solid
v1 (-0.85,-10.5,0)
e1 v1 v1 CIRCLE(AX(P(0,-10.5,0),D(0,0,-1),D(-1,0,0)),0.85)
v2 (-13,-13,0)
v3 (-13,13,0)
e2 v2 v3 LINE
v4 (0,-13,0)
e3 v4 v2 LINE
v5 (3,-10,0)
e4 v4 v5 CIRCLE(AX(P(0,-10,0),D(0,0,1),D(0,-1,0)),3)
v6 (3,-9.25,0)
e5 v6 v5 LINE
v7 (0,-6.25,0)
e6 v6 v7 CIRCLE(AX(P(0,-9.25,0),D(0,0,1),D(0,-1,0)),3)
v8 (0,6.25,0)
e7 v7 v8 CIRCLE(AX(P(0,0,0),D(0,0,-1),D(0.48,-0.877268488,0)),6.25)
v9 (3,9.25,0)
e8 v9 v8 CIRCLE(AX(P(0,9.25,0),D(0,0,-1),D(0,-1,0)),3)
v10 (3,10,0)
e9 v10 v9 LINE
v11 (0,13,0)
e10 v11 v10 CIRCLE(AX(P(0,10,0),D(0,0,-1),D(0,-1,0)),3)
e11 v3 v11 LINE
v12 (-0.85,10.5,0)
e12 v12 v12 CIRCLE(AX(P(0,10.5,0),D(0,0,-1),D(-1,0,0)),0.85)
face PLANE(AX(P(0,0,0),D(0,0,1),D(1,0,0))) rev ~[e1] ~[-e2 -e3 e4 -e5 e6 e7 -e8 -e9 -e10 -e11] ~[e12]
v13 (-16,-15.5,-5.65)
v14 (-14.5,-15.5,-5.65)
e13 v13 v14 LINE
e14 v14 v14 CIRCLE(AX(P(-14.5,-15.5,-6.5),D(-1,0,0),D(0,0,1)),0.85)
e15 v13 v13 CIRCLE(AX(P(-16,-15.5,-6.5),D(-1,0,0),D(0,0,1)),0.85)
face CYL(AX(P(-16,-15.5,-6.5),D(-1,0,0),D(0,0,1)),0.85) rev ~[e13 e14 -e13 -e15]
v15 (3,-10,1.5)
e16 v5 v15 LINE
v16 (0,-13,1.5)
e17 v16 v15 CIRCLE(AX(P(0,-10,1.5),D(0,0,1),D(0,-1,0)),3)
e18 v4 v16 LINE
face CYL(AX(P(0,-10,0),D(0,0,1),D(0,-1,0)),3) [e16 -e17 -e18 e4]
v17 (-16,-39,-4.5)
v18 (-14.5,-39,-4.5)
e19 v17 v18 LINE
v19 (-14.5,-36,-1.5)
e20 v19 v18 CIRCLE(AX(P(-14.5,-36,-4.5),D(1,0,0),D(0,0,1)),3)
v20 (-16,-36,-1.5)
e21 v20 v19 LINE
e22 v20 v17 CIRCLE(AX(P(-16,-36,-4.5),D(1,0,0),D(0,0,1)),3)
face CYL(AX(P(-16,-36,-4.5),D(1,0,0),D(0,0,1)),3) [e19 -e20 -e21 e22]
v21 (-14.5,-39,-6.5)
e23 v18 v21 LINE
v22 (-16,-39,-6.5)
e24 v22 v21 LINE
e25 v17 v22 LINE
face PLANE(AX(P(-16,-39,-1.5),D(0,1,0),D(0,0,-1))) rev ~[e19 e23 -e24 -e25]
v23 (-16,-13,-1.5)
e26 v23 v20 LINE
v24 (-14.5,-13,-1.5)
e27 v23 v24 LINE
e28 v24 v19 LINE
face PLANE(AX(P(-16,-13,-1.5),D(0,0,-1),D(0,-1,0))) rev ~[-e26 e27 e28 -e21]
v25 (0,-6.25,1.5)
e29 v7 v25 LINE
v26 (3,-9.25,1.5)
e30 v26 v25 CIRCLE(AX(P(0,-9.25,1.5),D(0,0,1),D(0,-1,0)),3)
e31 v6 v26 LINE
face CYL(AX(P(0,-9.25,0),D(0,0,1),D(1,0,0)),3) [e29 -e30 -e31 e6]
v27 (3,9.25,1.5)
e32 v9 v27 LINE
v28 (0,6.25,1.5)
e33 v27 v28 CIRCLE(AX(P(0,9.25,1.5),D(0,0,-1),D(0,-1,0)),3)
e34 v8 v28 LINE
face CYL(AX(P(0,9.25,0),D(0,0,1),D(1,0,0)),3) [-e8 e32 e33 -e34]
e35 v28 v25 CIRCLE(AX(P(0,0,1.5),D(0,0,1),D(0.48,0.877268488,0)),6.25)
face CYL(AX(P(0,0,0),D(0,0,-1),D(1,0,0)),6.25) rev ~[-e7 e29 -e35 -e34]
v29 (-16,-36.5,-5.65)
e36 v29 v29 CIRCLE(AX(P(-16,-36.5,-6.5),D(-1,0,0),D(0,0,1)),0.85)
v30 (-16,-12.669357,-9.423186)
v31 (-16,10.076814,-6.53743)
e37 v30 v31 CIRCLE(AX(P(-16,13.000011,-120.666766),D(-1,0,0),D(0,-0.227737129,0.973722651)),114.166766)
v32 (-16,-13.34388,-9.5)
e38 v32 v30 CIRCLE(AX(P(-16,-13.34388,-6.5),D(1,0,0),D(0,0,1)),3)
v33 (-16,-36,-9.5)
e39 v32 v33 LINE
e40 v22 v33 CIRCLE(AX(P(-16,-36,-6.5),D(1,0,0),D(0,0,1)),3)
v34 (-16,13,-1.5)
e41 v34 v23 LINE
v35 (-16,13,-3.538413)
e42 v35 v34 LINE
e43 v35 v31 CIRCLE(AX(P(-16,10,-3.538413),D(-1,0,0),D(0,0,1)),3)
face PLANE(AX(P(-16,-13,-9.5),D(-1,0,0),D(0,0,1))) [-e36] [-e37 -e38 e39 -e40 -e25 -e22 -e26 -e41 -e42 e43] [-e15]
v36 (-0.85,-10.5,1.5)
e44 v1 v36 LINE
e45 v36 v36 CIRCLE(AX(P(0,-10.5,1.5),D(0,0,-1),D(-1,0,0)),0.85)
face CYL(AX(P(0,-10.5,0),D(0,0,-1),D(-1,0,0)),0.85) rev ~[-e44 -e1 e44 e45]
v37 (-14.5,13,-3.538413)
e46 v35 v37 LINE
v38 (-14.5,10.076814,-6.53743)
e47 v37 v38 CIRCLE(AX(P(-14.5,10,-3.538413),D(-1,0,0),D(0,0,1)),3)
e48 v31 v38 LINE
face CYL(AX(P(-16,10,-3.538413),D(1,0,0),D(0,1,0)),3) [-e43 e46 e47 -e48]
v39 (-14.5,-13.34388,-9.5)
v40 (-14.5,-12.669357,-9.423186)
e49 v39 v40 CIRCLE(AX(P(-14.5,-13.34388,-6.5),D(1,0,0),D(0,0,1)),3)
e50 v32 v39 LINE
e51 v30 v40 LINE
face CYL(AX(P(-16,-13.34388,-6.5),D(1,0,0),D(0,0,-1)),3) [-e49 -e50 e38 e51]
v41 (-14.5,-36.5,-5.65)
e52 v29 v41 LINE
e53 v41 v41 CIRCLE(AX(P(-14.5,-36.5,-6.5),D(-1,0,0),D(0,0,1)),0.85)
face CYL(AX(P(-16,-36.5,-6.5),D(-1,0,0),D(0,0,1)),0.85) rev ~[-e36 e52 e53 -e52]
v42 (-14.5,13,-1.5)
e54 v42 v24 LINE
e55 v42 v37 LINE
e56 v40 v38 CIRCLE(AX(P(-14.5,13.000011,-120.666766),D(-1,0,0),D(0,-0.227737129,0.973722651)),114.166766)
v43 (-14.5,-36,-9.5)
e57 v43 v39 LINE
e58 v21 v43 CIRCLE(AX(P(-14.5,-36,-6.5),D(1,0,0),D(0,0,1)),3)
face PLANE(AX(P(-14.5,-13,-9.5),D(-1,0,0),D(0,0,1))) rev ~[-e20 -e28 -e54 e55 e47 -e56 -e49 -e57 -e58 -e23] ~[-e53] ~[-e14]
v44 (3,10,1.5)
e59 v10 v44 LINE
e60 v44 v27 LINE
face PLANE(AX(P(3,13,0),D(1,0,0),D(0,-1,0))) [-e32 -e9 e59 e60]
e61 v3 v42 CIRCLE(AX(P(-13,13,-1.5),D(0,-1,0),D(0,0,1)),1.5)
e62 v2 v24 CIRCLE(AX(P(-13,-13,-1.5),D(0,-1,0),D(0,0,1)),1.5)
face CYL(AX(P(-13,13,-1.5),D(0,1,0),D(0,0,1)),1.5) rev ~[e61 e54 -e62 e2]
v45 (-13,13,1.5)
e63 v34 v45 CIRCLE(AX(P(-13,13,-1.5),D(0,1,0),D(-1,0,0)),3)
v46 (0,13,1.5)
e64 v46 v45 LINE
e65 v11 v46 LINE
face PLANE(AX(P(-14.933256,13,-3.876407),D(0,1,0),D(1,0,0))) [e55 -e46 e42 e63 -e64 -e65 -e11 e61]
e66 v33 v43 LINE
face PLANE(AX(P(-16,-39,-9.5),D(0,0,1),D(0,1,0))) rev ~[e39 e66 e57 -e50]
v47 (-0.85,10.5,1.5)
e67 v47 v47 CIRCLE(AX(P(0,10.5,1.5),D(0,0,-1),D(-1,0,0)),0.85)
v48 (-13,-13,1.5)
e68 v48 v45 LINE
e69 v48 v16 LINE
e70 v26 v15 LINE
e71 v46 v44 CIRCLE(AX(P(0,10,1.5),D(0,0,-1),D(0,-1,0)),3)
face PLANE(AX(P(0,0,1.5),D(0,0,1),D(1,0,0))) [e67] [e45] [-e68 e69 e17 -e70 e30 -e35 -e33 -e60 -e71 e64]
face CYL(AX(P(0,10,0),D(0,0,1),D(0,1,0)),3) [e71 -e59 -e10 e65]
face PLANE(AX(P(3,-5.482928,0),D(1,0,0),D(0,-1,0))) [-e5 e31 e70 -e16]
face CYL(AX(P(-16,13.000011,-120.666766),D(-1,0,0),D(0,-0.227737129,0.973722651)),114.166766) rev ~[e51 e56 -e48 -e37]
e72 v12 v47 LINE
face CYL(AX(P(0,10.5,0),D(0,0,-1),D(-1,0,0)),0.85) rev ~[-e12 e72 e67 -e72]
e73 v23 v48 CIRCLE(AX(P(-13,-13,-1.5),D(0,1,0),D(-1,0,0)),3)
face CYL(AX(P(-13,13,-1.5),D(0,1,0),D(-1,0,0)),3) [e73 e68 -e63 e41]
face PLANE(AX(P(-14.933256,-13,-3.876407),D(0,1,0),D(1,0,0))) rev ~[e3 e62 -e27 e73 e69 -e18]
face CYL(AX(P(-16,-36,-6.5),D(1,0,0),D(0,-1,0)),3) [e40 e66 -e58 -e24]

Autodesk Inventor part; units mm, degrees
ref_plane "YZ Plane" through (0, 0, 0) normal (1, 0, 0) x (0, 1, 0)
ref_plane "XZ Plane" through (0, 0, 0) normal (0, 1, 0) x (-1, 0, 0)
ref_plane "XY Plane" through (0, 0, 0) normal (0, 0, 1) x (1, 0, 0)
sketch "スケッチ1" plane through (0, 0, 0) normal (0, 0, 1) x (1, 0, 0)
  circle A0 centre (0, 0) radius 6.25
  line L0 (0, 13) -> (-16, 13)
  line L1 (-16, 13) -> (-16, -13)
  line L2 (-16, -13) -> (0, -13)
  line L3 (0, -13) -> (0, 13)
  line L4 (0, 13) -> (3, 13)
  line L5 (3, 13) -> (3, -13)
  line L6 (3, -13) -> (0, -13)
  line L7 (0, -13) -> (0, 13)
  point P0 (-16, 0)
  point P1 (3, -5.4829)
  point P2 (3, 5.4829)
  dimension "d0" = 12.5
  dimension "d1" = 16
  dimension "d2" = 26
  dimension "d3" = 3
extrude "プレート1" add sketch "スケッチ1" along normal blind 1.5 contours A0 L3 L4 L5 | L5 L6 L3 A0 | A0 L3 L2 L1 L0
sketch "スケッチ2" plane through (-14.5, 13, 1.5) normal (-1, 0, 0) x (0, -1, 0)
  line L0 (26, 0) -> (0, 0)
  line L1 (0, 0) -> (0, -11)
  line L2 (0, -11) -> (26, -11)
  line L3 (26, -11) -> (26, 0)
edge flange "フランジ1" height 11 angle 90 thickness 1.5 bend radius 1.5 thickness toward (-1, 0, 0) relief tear relief width 1.5 relief depth 0.75 edges at (-16, 0, 0) wall of the first edge with corners at (-14.5, -13, 1.5) (-14.5, 13, 1.5) (-14.5, 13, -9.5) (-14.5, -13, -9.5)
bend "曲げ1"
corner "コーナー1"
sketch "スケッチ3" plane through (-16, -13, -9.5) normal (-1, 0, 0) x (0, 0, 1)
  line L0 (8, 0) -> (0, 0) projected
  line L1 (0, 0) -> (8, 0)
  line L2 (8, 0) -> (8, -26)
  line L3 (8, -26) -> (0, -26)
  line L4 (0, -26) -> (0, 0)
  line L5 (8, 0) -> (8, 26) projected
  arc A0 (0, 0) -> (3, 26) centre (-111.1667, 26) ccw
  line L6 (3, 20) -> (3, 26) construction
  line L7 (0, 26) -> (8, 26) projected
  line L8 (0, 0) -> (0, 26) projected
  point P0 (9.5, 13)
  point P1 (8, 0)
  dimension "d15" = 26
  dimension "d21" = 5
sheet face with bend "面2" sketch "スケッチ3" thickness 1.5 toward (1, 0, 0) bend radius 1.5 contours L2 L3 L4 L0
bend "曲げ2"
extrude "切り取り1" cut sketch "スケッチ3" against normal blind 1.5 contours L8 L7 A0
sketch "スケッチ5" plane through (0, 0, 0) normal (0, 0, -1) x (-1, 0, 0)
  circle A0 centre (0, 10.5) radius 0.85 projected
  circle A1 centre (0, -10.5) radius 0.85 projected
  point P0 (0, 0)
extrude "切り取り2" cut sketch "スケッチ5" against normal blind 1.5
sketch "スケッチ6" plane through (-16, -39, -1.5) normal (-1, 0, 0) x (0, 0, 1)
  circle A0 centre (-5, 23.5) radius 0.85 projected
  circle A1 centre (-5, 2.5) radius 0.85 projected
  point P0 (1.5, 39)
extrude "切り取り3" cut sketch "スケッチ6" against normal blind 1.5
fillet "フィレット1" radius 3 8 edges at (3, 13, 0.75) (3, 5.4829, 0.75) (3, -5.4829, 0.75) (3, -13, 0.75) (-15.25, -13, -9.5) (-15.25, 13, -6.5) (-15.25, -39, -9.5) (-15.25, -39, -1.5)
equation "\"d23\" = Thickness"
equation "\"d25\" = Thickness"
equation "\"d27\" = Thickness"
equation "\"d4\" = Thickness"
equation "\"d5\" = BendReliefWidth"
equation "\"d6\" = BendReliefDepth"
equation "\"d7\" = MinimumRemnant"
equation "\"d8\" = TransitionRadius"
equation "\"d11\" = BendRadius"
equation "\"d12\" = CornerReliefSize"
equation "\"d13\" = GapSize"
equation "\"d14\" = JacobiRadiusSize"
equation "\"d16\" = BendRadius"
equation "\"d17\" = BendReliefWidth"
equation "\"d19\" = MinimumRemnant"
equation "\"d18\" = BendReliefDepth"
equation "\"d20\" = TransitionRadius"
equation "\"BendRadius\" = Thickness"
equation "\"BendReliefWidth\" = Thickness"
equation "\"BendReliefDepth\" = 0.5 * Thickness"
equation "\"CornerReliefSize\" = 4 * Thickness"
equation "\"MinimumRemnant\" = 2 * Thickness"
equation "\"TransitionRadius\" = BendRadius"
equation "\"JacobiRadiusSize\" = BendRadius"
equation "\"GapSize\" = Thickness"
equation "\"Thickness\" = 1.5"
properties part number "hipjoint_toleg_under_right"
